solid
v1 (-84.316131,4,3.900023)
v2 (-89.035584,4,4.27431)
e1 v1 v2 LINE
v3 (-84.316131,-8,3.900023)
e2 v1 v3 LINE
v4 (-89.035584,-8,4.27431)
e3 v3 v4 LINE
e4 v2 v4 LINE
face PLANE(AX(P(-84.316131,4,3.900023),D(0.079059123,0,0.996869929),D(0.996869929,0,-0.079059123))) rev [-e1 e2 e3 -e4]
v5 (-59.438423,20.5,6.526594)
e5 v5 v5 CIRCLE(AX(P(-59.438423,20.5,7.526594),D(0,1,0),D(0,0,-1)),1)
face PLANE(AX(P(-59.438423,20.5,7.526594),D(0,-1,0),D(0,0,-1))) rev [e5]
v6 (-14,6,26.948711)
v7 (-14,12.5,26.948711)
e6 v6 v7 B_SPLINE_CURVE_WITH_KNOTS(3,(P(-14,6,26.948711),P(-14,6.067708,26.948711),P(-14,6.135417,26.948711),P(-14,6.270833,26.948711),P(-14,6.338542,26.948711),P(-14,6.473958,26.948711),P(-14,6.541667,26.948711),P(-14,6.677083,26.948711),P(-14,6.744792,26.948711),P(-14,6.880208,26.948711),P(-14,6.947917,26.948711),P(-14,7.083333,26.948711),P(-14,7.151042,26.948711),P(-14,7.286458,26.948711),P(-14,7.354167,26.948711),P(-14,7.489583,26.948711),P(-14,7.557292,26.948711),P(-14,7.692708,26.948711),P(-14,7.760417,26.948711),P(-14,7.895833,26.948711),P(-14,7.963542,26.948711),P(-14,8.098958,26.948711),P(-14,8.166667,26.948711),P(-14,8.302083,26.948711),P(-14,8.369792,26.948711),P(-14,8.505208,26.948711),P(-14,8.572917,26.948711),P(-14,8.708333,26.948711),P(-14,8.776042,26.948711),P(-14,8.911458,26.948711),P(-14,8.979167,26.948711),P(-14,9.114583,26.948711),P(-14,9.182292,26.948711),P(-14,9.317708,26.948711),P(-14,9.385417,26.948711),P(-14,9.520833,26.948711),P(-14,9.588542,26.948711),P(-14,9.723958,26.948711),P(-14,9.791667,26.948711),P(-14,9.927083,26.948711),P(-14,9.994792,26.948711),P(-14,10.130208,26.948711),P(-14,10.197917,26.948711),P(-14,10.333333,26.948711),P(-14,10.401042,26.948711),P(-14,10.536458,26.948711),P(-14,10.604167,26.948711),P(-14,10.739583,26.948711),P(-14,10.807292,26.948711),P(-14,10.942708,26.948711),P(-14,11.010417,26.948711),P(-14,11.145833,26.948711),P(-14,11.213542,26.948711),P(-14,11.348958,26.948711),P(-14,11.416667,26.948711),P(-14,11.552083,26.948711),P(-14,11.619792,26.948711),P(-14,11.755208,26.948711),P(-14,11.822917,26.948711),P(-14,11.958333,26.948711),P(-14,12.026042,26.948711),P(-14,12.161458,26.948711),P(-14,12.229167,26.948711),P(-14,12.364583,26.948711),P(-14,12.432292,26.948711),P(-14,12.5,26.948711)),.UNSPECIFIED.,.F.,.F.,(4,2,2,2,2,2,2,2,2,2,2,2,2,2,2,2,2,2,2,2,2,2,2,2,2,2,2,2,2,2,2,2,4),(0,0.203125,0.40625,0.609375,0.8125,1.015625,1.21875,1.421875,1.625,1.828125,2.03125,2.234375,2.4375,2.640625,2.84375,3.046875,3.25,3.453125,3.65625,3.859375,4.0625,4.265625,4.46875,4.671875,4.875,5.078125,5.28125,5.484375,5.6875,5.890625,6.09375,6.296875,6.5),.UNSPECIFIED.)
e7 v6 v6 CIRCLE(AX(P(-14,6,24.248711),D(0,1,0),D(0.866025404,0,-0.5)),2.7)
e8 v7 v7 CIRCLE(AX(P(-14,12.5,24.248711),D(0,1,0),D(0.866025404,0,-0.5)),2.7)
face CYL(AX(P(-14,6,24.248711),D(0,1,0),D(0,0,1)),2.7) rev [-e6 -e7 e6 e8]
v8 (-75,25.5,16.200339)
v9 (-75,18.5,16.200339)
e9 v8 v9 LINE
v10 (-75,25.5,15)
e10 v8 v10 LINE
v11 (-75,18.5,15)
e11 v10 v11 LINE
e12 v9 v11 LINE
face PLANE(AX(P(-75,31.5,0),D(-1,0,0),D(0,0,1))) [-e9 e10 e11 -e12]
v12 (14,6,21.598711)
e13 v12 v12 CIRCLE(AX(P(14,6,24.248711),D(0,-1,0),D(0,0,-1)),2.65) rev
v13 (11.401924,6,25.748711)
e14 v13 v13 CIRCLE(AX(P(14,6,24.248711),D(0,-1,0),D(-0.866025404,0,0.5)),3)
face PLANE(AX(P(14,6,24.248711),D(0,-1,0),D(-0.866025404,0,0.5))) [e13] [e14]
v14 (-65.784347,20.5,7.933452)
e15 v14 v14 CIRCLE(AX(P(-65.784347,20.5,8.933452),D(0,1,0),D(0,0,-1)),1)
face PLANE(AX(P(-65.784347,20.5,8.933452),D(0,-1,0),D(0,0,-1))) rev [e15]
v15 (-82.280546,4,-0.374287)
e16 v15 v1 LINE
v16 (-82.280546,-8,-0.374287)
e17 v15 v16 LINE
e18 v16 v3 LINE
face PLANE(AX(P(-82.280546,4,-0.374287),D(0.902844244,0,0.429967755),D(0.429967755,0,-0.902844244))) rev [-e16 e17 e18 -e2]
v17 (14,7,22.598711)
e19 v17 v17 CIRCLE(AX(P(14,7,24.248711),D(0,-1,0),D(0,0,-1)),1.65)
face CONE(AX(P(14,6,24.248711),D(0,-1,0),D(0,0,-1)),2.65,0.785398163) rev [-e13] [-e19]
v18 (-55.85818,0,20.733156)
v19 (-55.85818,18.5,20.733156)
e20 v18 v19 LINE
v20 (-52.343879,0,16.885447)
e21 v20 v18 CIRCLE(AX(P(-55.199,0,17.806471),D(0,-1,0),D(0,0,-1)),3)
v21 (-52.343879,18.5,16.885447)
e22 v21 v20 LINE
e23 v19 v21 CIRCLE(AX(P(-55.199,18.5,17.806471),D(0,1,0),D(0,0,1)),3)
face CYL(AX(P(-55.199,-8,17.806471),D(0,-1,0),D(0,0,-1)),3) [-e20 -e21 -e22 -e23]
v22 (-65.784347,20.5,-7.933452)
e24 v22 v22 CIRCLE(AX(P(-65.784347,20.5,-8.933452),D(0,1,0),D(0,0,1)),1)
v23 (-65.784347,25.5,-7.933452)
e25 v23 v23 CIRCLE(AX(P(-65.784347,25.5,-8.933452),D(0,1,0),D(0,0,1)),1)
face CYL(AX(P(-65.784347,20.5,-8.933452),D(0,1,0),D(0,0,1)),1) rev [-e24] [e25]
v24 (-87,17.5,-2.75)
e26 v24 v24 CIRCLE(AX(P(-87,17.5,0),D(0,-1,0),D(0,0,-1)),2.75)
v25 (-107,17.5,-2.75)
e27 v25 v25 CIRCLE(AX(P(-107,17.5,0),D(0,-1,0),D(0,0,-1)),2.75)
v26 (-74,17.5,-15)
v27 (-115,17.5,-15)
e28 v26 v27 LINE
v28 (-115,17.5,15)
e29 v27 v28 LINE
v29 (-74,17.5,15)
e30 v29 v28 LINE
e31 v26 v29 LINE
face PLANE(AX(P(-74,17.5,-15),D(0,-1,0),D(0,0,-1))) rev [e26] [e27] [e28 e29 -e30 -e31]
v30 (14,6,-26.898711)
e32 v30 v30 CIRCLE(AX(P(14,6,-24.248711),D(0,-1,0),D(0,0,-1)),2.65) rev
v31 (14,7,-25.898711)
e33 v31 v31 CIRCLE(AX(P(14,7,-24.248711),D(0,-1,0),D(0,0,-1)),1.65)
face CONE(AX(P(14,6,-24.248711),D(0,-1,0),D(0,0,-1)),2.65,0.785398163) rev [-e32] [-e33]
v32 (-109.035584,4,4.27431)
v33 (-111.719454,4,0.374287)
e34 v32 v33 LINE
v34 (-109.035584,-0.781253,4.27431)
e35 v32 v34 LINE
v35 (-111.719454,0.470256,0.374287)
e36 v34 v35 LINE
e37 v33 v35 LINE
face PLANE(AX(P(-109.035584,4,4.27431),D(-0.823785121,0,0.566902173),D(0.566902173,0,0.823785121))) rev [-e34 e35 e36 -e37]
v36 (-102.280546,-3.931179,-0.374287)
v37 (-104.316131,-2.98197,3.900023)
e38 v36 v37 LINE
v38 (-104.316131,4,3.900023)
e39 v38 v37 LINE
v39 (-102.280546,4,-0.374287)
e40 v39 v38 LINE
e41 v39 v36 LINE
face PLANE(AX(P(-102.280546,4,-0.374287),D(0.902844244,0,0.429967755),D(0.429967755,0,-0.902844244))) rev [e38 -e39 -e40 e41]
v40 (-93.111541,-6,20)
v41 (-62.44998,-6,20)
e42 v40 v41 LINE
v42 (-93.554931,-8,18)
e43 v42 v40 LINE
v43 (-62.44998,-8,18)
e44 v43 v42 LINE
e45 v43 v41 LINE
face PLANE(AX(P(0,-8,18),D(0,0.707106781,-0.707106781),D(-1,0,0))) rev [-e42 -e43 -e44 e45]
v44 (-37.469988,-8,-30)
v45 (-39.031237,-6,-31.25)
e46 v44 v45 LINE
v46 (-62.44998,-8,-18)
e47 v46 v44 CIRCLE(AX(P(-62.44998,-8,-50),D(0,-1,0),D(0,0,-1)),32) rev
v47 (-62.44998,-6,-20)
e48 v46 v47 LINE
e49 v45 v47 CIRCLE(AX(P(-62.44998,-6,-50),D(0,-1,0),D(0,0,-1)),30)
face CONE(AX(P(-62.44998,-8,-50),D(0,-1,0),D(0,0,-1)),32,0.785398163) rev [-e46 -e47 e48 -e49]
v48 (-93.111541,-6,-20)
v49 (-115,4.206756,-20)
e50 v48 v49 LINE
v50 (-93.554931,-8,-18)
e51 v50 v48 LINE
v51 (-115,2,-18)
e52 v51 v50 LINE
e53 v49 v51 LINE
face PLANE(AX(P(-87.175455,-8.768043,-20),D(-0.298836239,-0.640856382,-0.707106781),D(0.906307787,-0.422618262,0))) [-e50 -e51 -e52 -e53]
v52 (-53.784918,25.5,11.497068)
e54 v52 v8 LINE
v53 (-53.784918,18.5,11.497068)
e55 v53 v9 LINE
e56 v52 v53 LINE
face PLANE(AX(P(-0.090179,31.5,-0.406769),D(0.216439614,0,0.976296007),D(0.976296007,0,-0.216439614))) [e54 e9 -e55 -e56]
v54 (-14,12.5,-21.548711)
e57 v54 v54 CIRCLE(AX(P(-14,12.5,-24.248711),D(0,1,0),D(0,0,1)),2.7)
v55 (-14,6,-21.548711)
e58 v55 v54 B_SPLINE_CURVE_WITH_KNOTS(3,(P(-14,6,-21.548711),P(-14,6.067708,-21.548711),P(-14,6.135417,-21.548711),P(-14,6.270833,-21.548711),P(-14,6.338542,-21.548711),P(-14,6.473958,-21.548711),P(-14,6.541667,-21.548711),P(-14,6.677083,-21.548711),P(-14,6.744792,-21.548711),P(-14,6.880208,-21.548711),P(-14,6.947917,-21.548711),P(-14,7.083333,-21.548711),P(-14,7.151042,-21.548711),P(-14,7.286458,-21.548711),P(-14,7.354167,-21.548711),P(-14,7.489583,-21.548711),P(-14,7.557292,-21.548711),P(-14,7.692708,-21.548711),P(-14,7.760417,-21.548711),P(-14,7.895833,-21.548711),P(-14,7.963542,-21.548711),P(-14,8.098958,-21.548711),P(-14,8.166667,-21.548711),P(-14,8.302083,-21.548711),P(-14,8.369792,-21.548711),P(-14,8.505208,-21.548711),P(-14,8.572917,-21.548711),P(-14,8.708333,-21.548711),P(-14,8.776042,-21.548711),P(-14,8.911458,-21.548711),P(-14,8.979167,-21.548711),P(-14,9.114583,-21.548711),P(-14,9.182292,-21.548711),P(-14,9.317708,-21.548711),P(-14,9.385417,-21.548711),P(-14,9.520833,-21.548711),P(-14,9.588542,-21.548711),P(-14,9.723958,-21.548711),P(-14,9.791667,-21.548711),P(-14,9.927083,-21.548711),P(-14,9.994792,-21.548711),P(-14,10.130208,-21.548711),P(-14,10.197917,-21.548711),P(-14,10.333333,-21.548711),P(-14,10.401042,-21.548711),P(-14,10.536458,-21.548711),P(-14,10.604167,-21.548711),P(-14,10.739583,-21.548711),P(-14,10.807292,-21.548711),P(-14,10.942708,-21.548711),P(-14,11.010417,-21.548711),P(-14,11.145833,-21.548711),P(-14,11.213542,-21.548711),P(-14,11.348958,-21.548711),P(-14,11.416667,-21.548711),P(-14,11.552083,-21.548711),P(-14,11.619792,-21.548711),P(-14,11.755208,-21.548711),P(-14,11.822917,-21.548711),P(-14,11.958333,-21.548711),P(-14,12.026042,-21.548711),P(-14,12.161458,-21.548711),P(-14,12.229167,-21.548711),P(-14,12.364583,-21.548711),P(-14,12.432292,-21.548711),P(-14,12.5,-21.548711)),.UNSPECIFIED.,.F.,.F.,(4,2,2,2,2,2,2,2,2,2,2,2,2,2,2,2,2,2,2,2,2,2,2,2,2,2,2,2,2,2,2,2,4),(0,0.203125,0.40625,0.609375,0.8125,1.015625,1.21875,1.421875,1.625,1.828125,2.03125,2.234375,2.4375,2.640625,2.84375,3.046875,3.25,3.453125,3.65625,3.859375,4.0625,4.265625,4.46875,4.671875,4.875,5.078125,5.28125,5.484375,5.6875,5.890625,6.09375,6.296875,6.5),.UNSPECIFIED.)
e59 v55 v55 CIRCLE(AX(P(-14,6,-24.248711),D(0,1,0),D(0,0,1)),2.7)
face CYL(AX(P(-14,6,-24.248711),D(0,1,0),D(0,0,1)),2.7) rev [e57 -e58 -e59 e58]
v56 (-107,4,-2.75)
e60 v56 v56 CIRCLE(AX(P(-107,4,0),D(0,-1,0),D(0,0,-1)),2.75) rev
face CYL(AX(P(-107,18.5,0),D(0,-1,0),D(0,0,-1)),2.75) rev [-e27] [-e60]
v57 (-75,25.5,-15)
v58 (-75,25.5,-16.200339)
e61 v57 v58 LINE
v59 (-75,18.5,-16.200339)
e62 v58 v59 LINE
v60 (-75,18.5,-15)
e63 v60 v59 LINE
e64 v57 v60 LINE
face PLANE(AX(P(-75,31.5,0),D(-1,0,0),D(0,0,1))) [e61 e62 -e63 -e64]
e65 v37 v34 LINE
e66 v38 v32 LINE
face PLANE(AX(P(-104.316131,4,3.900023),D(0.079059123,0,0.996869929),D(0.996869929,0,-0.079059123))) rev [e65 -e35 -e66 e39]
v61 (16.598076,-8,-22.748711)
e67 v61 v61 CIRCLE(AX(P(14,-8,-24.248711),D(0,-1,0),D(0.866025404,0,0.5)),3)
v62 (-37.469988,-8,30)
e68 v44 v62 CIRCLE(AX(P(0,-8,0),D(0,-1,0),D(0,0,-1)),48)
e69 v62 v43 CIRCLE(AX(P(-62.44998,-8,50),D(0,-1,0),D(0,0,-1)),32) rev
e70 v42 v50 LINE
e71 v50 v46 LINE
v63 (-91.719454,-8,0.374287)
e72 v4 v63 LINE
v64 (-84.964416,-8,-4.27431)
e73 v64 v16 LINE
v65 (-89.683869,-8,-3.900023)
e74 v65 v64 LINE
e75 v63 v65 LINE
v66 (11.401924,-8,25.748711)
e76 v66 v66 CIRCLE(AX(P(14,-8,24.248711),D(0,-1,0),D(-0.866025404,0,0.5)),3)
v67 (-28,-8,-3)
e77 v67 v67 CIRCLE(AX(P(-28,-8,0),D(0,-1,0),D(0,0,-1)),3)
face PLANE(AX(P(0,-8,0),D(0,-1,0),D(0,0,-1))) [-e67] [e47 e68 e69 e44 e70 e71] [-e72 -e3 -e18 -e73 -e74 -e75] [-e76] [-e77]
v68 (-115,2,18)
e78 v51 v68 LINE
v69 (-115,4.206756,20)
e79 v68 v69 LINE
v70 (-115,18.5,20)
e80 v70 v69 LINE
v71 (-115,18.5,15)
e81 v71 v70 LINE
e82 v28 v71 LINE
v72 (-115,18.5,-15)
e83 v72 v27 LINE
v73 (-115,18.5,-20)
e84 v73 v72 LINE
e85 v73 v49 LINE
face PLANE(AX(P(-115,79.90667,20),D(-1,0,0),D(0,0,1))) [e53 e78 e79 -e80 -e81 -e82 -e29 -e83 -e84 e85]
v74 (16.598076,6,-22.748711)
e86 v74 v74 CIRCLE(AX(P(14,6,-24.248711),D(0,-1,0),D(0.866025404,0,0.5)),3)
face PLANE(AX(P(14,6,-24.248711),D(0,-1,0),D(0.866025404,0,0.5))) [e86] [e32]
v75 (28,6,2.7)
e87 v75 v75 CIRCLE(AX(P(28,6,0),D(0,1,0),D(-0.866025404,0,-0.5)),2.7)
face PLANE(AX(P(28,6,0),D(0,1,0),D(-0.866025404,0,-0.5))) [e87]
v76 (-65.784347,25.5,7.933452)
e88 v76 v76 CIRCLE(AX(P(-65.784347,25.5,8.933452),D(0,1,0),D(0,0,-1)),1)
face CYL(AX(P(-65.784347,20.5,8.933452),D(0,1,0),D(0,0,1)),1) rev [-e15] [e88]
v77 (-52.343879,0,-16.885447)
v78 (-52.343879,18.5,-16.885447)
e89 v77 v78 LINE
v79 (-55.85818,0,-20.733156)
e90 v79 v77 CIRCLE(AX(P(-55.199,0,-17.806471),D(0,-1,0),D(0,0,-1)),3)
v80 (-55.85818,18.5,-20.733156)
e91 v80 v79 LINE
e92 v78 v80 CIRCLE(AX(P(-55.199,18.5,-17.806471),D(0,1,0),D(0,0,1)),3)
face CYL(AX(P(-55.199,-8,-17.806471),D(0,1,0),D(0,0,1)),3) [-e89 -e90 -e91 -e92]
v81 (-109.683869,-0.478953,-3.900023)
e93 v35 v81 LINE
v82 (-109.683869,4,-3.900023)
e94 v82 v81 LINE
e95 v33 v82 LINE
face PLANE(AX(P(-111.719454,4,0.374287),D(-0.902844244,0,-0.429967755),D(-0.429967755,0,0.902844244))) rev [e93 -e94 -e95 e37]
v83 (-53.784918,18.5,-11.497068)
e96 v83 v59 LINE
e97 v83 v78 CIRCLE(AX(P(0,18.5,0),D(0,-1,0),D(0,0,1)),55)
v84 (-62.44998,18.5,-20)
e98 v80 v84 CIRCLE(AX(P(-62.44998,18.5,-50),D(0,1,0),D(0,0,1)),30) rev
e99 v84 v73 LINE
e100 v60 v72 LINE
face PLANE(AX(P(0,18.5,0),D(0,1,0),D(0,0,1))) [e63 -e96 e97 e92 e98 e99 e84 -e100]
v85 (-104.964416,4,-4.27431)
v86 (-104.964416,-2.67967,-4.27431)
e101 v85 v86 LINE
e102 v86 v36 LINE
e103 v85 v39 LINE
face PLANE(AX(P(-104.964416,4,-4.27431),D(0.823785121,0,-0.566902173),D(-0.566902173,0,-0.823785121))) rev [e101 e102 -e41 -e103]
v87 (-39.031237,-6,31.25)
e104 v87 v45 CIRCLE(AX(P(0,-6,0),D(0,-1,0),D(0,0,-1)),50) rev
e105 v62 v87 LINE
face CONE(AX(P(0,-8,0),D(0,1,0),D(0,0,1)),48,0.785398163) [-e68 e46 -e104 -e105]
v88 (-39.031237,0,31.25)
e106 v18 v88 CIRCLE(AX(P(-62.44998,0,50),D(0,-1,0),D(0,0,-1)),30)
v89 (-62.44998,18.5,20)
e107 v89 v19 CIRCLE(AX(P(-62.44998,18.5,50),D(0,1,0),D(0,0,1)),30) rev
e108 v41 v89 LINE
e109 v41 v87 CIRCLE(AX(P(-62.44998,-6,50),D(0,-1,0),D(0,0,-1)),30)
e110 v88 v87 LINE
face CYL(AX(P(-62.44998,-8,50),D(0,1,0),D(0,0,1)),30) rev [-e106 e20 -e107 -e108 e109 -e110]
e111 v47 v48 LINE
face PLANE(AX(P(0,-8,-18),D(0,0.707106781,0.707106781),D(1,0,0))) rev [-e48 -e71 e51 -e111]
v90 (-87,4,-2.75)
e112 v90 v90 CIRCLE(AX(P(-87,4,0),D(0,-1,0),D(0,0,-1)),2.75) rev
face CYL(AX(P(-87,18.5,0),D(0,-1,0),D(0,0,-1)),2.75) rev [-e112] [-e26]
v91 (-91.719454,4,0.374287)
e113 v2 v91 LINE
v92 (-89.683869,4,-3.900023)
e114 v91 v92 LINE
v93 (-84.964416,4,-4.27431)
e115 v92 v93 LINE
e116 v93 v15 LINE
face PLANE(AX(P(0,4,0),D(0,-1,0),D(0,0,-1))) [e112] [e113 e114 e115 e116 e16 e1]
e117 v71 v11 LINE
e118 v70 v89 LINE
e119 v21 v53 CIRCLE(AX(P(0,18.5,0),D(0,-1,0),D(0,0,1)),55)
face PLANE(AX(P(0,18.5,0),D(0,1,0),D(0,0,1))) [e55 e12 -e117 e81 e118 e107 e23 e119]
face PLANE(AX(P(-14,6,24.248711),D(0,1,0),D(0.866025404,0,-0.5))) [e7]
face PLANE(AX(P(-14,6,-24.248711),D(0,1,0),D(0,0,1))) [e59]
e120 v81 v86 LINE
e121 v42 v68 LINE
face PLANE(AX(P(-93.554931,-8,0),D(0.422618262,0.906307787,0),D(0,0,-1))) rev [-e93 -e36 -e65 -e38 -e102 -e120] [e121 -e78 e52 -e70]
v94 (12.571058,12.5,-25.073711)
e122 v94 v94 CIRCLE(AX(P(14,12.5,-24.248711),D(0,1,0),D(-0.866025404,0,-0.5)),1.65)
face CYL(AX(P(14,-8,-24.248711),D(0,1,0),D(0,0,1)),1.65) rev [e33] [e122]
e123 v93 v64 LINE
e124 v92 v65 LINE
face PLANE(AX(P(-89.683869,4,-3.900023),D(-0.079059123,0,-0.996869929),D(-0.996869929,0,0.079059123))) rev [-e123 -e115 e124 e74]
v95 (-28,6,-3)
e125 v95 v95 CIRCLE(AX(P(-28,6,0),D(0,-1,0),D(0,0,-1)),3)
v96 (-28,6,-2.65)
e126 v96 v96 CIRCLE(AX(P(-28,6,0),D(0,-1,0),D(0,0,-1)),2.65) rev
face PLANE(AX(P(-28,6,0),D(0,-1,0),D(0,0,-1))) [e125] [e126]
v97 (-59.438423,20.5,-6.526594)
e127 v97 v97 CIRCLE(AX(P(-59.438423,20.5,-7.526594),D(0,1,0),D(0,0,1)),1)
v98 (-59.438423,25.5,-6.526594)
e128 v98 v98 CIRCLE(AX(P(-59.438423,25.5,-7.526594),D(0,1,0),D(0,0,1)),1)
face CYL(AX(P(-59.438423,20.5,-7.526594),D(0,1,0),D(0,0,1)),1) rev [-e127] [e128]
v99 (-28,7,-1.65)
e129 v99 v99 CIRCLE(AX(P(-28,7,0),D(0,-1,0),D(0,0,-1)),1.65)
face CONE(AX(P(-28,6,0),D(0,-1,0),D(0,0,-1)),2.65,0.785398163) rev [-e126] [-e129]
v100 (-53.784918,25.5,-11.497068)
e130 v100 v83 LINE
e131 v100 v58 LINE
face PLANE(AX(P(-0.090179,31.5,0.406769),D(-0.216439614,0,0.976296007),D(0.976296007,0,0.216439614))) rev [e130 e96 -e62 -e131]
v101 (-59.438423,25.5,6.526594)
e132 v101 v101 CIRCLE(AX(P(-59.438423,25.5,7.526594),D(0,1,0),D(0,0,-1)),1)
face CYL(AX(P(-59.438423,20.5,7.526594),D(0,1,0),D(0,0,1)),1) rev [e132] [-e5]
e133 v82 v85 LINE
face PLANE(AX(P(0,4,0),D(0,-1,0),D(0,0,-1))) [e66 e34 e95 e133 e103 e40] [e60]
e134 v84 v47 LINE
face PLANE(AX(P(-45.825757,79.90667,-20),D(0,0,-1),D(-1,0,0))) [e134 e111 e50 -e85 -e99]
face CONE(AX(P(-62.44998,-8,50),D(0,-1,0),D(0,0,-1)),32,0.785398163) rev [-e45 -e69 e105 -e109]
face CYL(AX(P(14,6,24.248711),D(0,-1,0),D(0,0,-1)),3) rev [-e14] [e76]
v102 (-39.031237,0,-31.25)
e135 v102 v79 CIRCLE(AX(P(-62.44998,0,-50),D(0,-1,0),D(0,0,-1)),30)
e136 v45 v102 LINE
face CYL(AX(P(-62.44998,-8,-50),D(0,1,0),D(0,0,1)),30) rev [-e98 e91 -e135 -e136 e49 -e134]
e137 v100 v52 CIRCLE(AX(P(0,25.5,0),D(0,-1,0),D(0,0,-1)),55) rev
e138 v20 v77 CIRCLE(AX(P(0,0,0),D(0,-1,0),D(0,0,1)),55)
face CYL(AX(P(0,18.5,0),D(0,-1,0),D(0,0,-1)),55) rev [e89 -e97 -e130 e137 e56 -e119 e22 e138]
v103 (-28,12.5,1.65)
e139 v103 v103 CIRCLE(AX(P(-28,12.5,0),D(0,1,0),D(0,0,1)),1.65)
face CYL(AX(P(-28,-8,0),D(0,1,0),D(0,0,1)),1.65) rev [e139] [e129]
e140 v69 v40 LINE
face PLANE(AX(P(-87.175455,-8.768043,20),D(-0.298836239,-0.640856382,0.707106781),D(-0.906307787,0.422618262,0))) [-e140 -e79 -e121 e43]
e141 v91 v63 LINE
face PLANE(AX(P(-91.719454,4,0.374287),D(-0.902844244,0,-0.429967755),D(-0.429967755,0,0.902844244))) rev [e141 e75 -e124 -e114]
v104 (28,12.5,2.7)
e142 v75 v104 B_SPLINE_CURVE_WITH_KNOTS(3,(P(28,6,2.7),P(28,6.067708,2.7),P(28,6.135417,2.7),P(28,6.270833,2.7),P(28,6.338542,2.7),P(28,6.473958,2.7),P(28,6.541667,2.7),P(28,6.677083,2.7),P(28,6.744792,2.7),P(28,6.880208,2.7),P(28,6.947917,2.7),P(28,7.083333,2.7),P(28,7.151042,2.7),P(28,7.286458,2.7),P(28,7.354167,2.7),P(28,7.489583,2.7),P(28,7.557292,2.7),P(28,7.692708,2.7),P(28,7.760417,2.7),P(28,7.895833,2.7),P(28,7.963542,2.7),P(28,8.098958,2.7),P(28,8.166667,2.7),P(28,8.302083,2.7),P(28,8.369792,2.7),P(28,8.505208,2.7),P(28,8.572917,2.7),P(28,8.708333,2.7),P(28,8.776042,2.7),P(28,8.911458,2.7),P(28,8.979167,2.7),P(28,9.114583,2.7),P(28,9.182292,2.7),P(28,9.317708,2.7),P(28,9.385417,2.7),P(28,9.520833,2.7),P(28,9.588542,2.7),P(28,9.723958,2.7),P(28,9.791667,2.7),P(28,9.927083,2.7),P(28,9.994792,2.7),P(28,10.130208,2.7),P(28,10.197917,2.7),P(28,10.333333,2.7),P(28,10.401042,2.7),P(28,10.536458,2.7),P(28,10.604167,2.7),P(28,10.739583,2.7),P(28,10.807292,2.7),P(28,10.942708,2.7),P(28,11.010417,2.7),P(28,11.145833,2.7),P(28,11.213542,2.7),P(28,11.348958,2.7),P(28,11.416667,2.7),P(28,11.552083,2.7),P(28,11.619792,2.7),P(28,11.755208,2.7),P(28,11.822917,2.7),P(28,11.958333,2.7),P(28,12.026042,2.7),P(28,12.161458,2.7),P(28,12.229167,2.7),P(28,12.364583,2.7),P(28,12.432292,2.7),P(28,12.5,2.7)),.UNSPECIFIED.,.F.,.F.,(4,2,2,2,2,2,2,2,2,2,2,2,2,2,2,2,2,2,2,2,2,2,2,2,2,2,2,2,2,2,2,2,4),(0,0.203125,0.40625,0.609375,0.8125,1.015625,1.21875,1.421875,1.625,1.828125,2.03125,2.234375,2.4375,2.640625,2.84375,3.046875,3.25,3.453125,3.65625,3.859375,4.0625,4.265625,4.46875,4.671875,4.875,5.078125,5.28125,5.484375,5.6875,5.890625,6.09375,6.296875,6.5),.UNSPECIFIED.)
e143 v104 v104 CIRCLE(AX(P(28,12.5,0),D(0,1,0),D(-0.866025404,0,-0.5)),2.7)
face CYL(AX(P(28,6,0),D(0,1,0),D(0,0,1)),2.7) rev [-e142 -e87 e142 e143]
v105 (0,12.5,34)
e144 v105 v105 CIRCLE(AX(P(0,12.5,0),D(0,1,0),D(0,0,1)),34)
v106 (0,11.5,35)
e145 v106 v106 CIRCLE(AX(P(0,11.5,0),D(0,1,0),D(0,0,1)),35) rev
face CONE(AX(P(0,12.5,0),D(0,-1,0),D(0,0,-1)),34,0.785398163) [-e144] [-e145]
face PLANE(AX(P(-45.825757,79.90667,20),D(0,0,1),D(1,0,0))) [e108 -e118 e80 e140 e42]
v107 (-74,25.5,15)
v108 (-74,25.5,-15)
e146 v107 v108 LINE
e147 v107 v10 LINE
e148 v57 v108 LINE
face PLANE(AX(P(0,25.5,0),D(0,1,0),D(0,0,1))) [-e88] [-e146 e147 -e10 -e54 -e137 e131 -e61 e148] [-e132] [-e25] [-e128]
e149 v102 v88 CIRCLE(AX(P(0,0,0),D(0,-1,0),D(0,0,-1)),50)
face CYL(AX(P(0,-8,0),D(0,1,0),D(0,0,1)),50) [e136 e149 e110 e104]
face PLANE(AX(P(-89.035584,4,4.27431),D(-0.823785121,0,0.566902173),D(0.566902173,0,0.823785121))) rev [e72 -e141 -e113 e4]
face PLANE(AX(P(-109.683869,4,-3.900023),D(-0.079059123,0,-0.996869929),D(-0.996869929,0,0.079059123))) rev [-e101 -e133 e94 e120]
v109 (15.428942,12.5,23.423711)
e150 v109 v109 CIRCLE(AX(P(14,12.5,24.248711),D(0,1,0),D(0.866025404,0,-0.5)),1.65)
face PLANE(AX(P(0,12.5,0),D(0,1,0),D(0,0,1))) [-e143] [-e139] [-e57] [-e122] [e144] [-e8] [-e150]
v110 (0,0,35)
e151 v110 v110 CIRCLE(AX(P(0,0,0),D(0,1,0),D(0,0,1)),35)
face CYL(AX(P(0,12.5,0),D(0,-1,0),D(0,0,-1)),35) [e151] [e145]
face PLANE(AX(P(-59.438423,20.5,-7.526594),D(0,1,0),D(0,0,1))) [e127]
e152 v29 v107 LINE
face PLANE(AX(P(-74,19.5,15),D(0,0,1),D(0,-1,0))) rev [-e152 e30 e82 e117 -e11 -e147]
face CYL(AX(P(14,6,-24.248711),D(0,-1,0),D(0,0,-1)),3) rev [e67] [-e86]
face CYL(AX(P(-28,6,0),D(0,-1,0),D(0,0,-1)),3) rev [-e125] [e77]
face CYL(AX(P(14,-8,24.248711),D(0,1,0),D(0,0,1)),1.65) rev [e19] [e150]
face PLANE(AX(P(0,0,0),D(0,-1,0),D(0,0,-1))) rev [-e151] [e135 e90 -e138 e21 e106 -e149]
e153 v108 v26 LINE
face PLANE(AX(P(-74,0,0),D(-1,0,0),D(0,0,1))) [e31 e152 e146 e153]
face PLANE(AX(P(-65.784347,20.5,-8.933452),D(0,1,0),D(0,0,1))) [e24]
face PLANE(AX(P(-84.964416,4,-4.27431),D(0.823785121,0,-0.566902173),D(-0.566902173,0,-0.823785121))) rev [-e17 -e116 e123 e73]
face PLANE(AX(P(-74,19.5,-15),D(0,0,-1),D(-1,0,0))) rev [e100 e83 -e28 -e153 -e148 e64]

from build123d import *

# Parameters (mm, degrees)
SKETCH1_R           = 35.00000000000001
BOSS_EXTRUDE1_DEPTH = 1
SKETCH3_R           = 50
BOSS_EXTRUDE3_DEPTH = 8
BOSS_EXTRUDE5_START = -8
BOSS_EXTRUDE5_DEPTH = 8
BOSS_EXTRUDE6_DEPTH = 18.5
FILLET1_R           = 30
CUT_EXTRUDE14_DEPTH = 41
SKETCH26_R          = 2.750000000000008
CUT_EXTRUDE15_DEPTH = 129.1688339652039
CUT_EXTRUDE16_DEPTH = 12
BOSS_EXTRUDE7_DEPTH = 13
CUT_EXTRUDE21_DEPTH = 6
SKETCH34_R          = 0.9999999999999981
SKETCH34_R_2        = 0.9999999999999836
SKETCH34_R_3        = 0.9999999999999983
CUT_EXTRUDE22_DEPTH = 5
CHAMFER4_SIZE       = 1
FILLET3_R           = 3
CHAMFER6_SIZE       = 21.445069205
CHAMFER6_SIZE_2     = 10
CHAMFER7_SIZE       = 2
SKETCH37_W          = 12.834846050171059
SKETCH37_H          = 29.012722943474188
CUT_EXTRUDE24_DEPTH = 15
SKETCH38_R          = 27.891707032209062
CUT_EXTRUDE25_DEPTH = 6
SKETCH39_R          = 35.00000000000001
BOSS_EXTRUDE8_DEPTH = 12.5
CHAMFER8_SIZE       = 1
SKETCH40_R          = 2.700000000000001
CUT_EXTRUDE26_DEPTH = 6.5
CIRPATTERN1_COUNT   = 3
SKETCH41_R          = 1.6499999999999986
CUT_EXTRUDE27_DEPTH = 128.06396040183856
SKETCH42_R          = 2.9999999999999973
CUT_EXTRUDE28_DEPTH = 14
CIRPATTERN2_COUNT   = 3
CHAMFER9_SIZE       = 1


# Some blends are built 0.0001 mm under size
with BuildPart() as part:
    # Sketch1 → Boss-Extrude1 (new body)
    with BuildSketch(Plane(origin=(0, 0, 0), x_dir=(1, 0, 0), z_dir=(0, 1, 0))):
        with Locations(Location((0, 0, 0), (0, 0, 270))):
            Circle(SKETCH1_R)
    extrude(amount=BOSS_EXTRUDE1_DEPTH)

    # Sketch3 → Boss-Extrude3 (add)
    with BuildSketch(Plane.XZ):
        with Locations(Location((0, 0, 0), (0, 0, 270))):
            Circle(SKETCH3_R)
    extrude(amount=BOSS_EXTRUDE3_DEPTH)

    # Sketch22 → Boss-Extrude5 (add)
    with BuildSketch(Plane.XZ.offset(8).offset(BOSS_EXTRUDE5_START)):
        with BuildLine():
            Line((-45.82575694955839, 20.000000000000004), (-115.00000000000001, 19.999999999999996))
            Line((-115.00000000000001, 19.999999999999996), (-114.99999999999999, -20.000000000000004))
            Line((-114.99999999999999, -20.000000000000004), (-45.825756949558404, -19.999999999999996))
            ThreePointArc((-45.825756949558404, -19.999999999999996), (-49.99999999999999, 6.12e-15), (-45.82575694955839, 20.000000000000004))
        make_face()
    extrude(amount=BOSS_EXTRUDE5_DEPTH)

    # Sketch24 → Boss-Extrude6 (add)
    with BuildSketch(Plane(origin=(0, 0, 0), x_dir=(1, 0, 0), z_dir=(0, 1, 0))):
        with BuildLine():
            Line((-115, -20), (-51.234753829797995, -20))
            ThreePointArc((-51.234753829797995, -20), (-55.00000000000001, -1.769e-14), (-51.234753829798, 19.999999999999986))
            Line((-51.234753829798, 19.999999999999986), (-115, 20))
            Line((-115, 20), (-115, -20))
        make_face()
    extrude(amount=BOSS_EXTRUDE6_DEPTH)

    # Fillet1
    # the kernel refuses this fillet: 30 mm, written as the material it adds along each edge
    with BuildSketch(Plane(origin=(-45.82575694955841, 41.56055758606396, -19.99999999999998), x_dir=(0.5169843319372891, 0, -0.8559948601080236), z_dir=(0, -1, 0))) as fillet1_piece_1_section:
        with BuildLine():
            CenterArc((17.08538296381171, -29.73977942887639), FILLET1_R, 97.55200448764381, 51.31781254651054)
            Line((-8.594462839428994, -14.230249470757709), (0, 0))
            ThreePointArc((0, 0), (6.571301139927558, -0.4337009518726829), (13.142602279855161, 2.6e-16))
        make_face()
    fillet1_piece_1 = extrude(amount=49.56055758606396, mode=Mode.PRIVATE)
    fillet1_piece_1 = split(fillet1_piece_1, bisect_by=Plane(origin=(-54.99640948275243, 0, -20.321571005076215), z_dir=(0, 1, 0)), keep=Keep.TOP, mode=Mode.PRIVATE)
    fillet1_piece_1 = fillet1_piece_1 - Plane(origin=(-9.592e-14, 9.249999999999998, -8.9e-16), x_dir=(-0.9315409787235996, 0, 0.36363636363636426), z_dir=(0, -1, 0)) * Cylinder(54.999999999999915, 157, mode=Mode.PRIVATE)
    fillet1_piece_1 = split(fillet1_piece_1, bisect_by=Plane(origin=(-54.99640948275243, 18.5, -20.321571005076215), z_dir=(0, -1, 0)), keep=Keep.TOP, mode=Mode.PRIVATE)
    add(fillet1_piece_1)
    with BuildSketch(Plane(origin=(-45.825756949558404, 0, -20), x_dir=(0.5169843319372893, 0, -0.8559948601080234), z_dir=(0, -1, 0))) as fillet1_piece_2_section:
        with BuildLine():
            CenterArc((17.08538296381168, -29.739779428876385), FILLET1_R, 97.5520044876438, 51.31781254651055)
            Line((-8.594462839429019, -14.2302494707577), (0, 0))
            ThreePointArc((0, 0), (6.571301139927535, -0.4337009518726803), (13.142602279855138, 7.9e-16))
        make_face()
    fillet1_piece_2 = extrude(amount=8, mode=Mode.PRIVATE)
    fillet1_piece_2 = fillet1_piece_2 & Plane(origin=(-9.592e-14, -4, -8.9e-16), x_dir=(-0.9315409787235996, 0, 0.36363636363636426), z_dir=(0, -1, 0)) * Cylinder(54.999999999999915, 73, mode=Mode.PRIVATE)
    add(fillet1_piece_2)
    with BuildSketch(Plane(origin=(-45.825756949558404, 0, -20), x_dir=(0.5169843319372893, 0, -0.8559948601080234), z_dir=(0, -1, 0))) as fillet1_piece_3_section:
        with BuildLine():
            CenterArc((17.08538296381168, -29.739779428876385), FILLET1_R, 97.5520044876438, 51.31781254651055)
            Line((-8.594462839429019, -14.2302494707577), (0, 0))
            ThreePointArc((0, 0), (6.571301139927535, -0.4337009518726803), (13.142602279855138, 7.9e-16))
        make_face()
    fillet1_piece_3 = extrude(amount=8, mode=Mode.PRIVATE)
    fillet1_piece_3 = fillet1_piece_3 - Plane(origin=(-9.592e-14, -4, -8.9e-16), x_dir=(-0.9315409787235996, 0, 0.36363636363636426), z_dir=(0, -1, 0)) * Cylinder(54.999999999999915, 73, mode=Mode.PRIVATE)
    add(fillet1_piece_3)
    with BuildSketch(Plane(origin=(-45.82575694955839, 41.56055758606398, 20.000000000000007), x_dir=(0.5169843319372891, 0, 0.8559948601080235), z_dir=(0, -1, 0))) as fillet1_piece_4_section:
        with BuildLine():
            CenterArc((17.085382963811668, 29.739779428876385), FILLET1_R, 211.13018296584565, 51.31781254651054)
            Line((-8.594462839429031, 14.2302494707577), (0, 0))
            ThreePointArc((0, 0), (6.571301139927557, 0.4337009518726914), (13.142602279855119, 9.1e-16))
        make_face()
    fillet1_piece_4 = extrude(amount=49.56055758606398, mode=Mode.PRIVATE)
    fillet1_piece_4 = split(fillet1_piece_4, bisect_by=Plane(origin=(-54.99640948275241, 0, 20.321571005076237), z_dir=(0, 1, 0)), keep=Keep.TOP, mode=Mode.PRIVATE)
    fillet1_piece_4 = split(fillet1_piece_4, bisect_by=Plane(origin=(-54.99640948275241, 18.5, 20.321571005076237), z_dir=(0, -1, 0)), keep=Keep.TOP, mode=Mode.PRIVATE)
    fillet1_piece_4 = fillet1_piece_4 - Plane(origin=(-9.592e-14, 9.249999999999996, -8.9e-16), x_dir=(-0.9315409787235996, 0, 0.36363636363636426), z_dir=(0, -1, 0)) * Cylinder(54.999999999999915, 157, mode=Mode.PRIVATE)
    add(fillet1_piece_4)
    with BuildSketch(Plane(origin=(-45.82575694955839, 0, 20.000000000000007), x_dir=(0.5169843319372891, 0, 0.8559948601080235), z_dir=(0, -1, 0))) as fillet1_piece_5_section:
        with BuildLine():
            CenterArc((17.085382963811668, 29.739779428876385), FILLET1_R, 211.13018296584565, 51.31781254651054)
            Line((-8.594462839429031, 14.2302494707577), (0, 0))
            ThreePointArc((0, 0), (6.571301139927557, 0.4337009518726914), (13.142602279855119, 9.1e-16))
        make_face()
    fillet1_piece_5 = extrude(amount=8, mode=Mode.PRIVATE)
    fillet1_piece_5 = fillet1_piece_5 & Plane(origin=(-9.592e-14, -4.000000000000001, -8.9e-16), x_dir=(-0.9315409787235996, 0, 0.36363636363636426), z_dir=(0, -1, 0)) * Cylinder(54.999999999999915, 73, mode=Mode.PRIVATE)
    add(fillet1_piece_5)
    with BuildSketch(Plane(origin=(-45.82575694955839, 0, 20.000000000000007), x_dir=(0.5169843319372891, 0, 0.8559948601080235), z_dir=(0, -1, 0))) as fillet1_piece_6_section:
        with BuildLine():
            CenterArc((17.085382963811668, 29.739779428876385), FILLET1_R, 211.13018296584565, 51.31781254651054)
            Line((-8.594462839429031, 14.2302494707577), (0, 0))
            ThreePointArc((0, 0), (6.571301139927557, 0.4337009518726914), (13.142602279855119, 9.1e-16))
        make_face()
    fillet1_piece_6 = extrude(amount=8, mode=Mode.PRIVATE)
    fillet1_piece_6 = fillet1_piece_6 - Plane(origin=(-9.592e-14, -3.9999999999999996, -8.9e-16), x_dir=(-0.9315409787235996, 0, 0.36363636363636426), z_dir=(0, -1, 0)) * Cylinder(54.999999999999915, 73, mode=Mode.PRIVATE)
    add(fillet1_piece_6)

    # Sketch25 → Cut-Extrude14 (cut)
    with BuildSketch(Plane.ZY.offset(115)):
        Polygon((-14.999999999999982, 19.5), (15.000000000000018, 19.5), (15.000000000000016, 17.499999999999996), (-14.999999999999982, 17.499999999999996), align=None)
    extrude(amount=-CUT_EXTRUDE14_DEPTH, mode=Mode.SUBTRACT)

    # Sketch26 → Cut-Extrude15 (cut, through all)
    with BuildSketch(Plane.XZ.offset(8)):
        with Locations(Location((-107.00000000000001, 0, 0), (0, 0, 270))):
            Circle(SKETCH26_R)
        with Locations(Location((-87.00000000000001, 0, 0), (0, 0, 270))):
            Circle(SKETCH26_R)
    extrude(amount=-CUT_EXTRUDE15_DEPTH, mode=Mode.SUBTRACT)

    # Sketch27 → Cut-Extrude16 (cut)
    with BuildSketch(Plane.XZ.offset(8)):
        Polygon((-82.28054640148135, -0.37428740930267296), (-84.31613079596788, 3.900023003647695), (-89.03558439448656, 4.274310412950378), (-91.71945359851865, 0.37428740930269205), (-89.6838692040321, -3.900023003647699), (-84.96441560551347, -4.27431041295038), align=None)
        Polygon((-102.2805464014813, -0.3742874093023039), (-104.31613079596819, 3.9000230036479127), (-109.03558439448689, 4.2743104129502205), (-111.71945359851868, 0.3742874093023178), (-109.6838692040318, -3.9000230036479184), (-104.96441560551311, -4.274310412950226), align=None)
    extrude(amount=-CUT_EXTRUDE16_DEPTH, mode=Mode.SUBTRACT)

    # Sketch31 → Boss-Extrude7 (add)
    with BuildSketch(Plane(origin=(0, 18.5, 0), x_dir=(1, 0, 0), z_dir=(0, 1, 0))):
        with BuildLine():
            ThreePointArc((-53.78491816400905, -11.497068238940331), (-55.00000000000001, 1.78e-15), (-53.78491816400905, 11.497068238940333))
            Line((-53.784918164009056, 11.49706823894033), (-75.00000000000001, 16.200338649512723))
            Line((-75.00000000000001, 16.200338649512723), (-75.00000000000001, 15.000000000000064))
            Line((-75.00000000000001, 15.000000000000062), (-74.00000000000001, 15.000000000000062))
            Line((-74.00000000000001, 15.000000000000062), (-74.00000000000001, -14.999999999999938))
            Line((-74.00000000000001, -14.99999999999994), (-75.00000000000001, -14.99999999999994))
            Line((-75.00000000000001, -14.99999999999994), (-75.00000000000001, -16.20033864951273))
            Line((-75.00000000000001, -16.20033864951273), (-53.78491816400905, -11.497068238940331))
        make_face()
    extrude(amount=BOSS_EXTRUDE7_DEPTH)

    # Sketch33 → Cut-Extrude21 (cut)
    with BuildSketch(Plane(origin=(0, 31.5, 0), x_dir=(1, 0, 0), z_dir=(0, 1, 0))):
        Polygon((-55.01517410235079, -11.769809414155478), (-67.9999109970459, -14.648456279532263), (-70.10648365162008, -5.146321092962614), (-75.00000000000001, -5.146321092962625), (-75.00000000000001, 5.14632109296261), (-70.10648365162008, 5.146321092962607), (-67.9999109970459, 14.648456279532258), (-55.0151741023508, 11.769809414155473), (-57.019051941153975, 2.730900606366049), (-57.019051941153975, -2.730900606366056), align=None)
    extrude(amount=-CUT_EXTRUDE21_DEPTH, mode=Mode.SUBTRACT)

    # Sketch34 → Cut-Extrude22 (cut)
    with BuildSketch(Plane(origin=(0, 25.500000000000004, 0), x_dir=(1, 0, 0), z_dir=(0, 1, 0))):
        with Locations(Location((-59.4384225576429, -7.526594465233379, 0), (0, 0, 90))):
            Circle(SKETCH34_R)
        with Locations(Location((-65.78434660392244, -8.93345195583105, 0), (0, 0, 90))):
            Circle(SKETCH34_R_2)
        with Locations(Location((-65.78434660392244, 8.933451955831046, 0), (0, 0, 270))):
            Circle(SKETCH34_R_3)
        with Locations(Location((-59.4384225576429, 7.526594465233379, 0), (0, 0, 270))):
            Circle(SKETCH34_R_3)
    extrude(amount=-CUT_EXTRUDE22_DEPTH, mode=Mode.SUBTRACT)

    # Chamfer4
    chamfer4_edges = [part.edges().sort_by_distance(p)[0] for p in [
        (1.072e-14, 1, -35.00000000000001),
    ]]
    chamfer(chamfer4_edges, length=CHAMFER4_SIZE - 0.0001)  # a hair under: the kernel refuses the full size

    # Fillet3
    fillet3_edges = [part.edges().sort_by_distance(p)[0] for p in [
        (-50.11900944881917, 9.25, -22.651377262082175),
        (-50.11900944881917, 9.25, 22.651377262082175),
    ]]
    fillet(fillet3_edges, radius=FILLET3_R)

    # Chamfer6
    # the kernel refuses this chamfer: 21.445069205, 10 mm, written as the material it takes off along each edge
    with BuildSketch(Plane(origin=(-115.00000000000006, -8, 75.56364829338291), x_dir=(0.9998669641130703, -0.01631116413111022, 0), z_dir=(7.1e-16, 0, -1))) as chamfer6_piece_1:
        Polygon((CHAMFER6_SIZE * 0.999866964118, -CHAMFER6_SIZE * 0.0163111641312), (-CHAMFER6_SIZE_2 * 0.0163111641311, -CHAMFER6_SIZE_2 * 0.999866964113), (0, 0), align=None)
    extrude(amount=151.12729658676582, mode=Mode.SUBTRACT)

    # Chamfer7
    chamfer7_edges = [part.edges().sort_by_distance(p)[0] for p in [
        (-78.00245538943895, -8, -20),
        (-104.27746539744713, -2.9999999999993117, -20.000000000000014),
        (-104.27746539744714, -2.999999999999309, 19.99999999999999),
        (50.00000000000001, -8, -1.2434e-13),
        (-78.00245538943881, -8, 20),
        (-49.459598927217584, -8, -22.958365434019104),
        (-49.45959892721735, -8, 22.958365434019218),
    ]]
    chamfer(chamfer7_edges, length=CHAMFER7_SIZE)

    # Sketch37 → Cut-Extrude24 (cut)
    with BuildSketch(Plane(origin=(0, 25.500000000000004, 0), x_dir=(1, 0, 0), z_dir=(0, 1, 0))):
        with Locations((-55, 2.66e-15)):
            Rectangle(SKETCH37_W, SKETCH37_H)
    extrude(amount=CUT_EXTRUDE24_DEPTH, mode=Mode.SUBTRACT)

    # Sketch38 → Cut-Extrude25 (cut)
    with BuildSketch(Plane(origin=(0, 25.500000000000004, 0), x_dir=(1, 0, 0), z_dir=(0, 1, 0))):
        with Locations((-75.67479968793842, -4.698694832568158)):
            Circle(SKETCH38_R)
    extrude(amount=CUT_EXTRUDE25_DEPTH, mode=Mode.SUBTRACT)

    # Sketch39 → Boss-Extrude8 (add)
    with BuildSketch(Plane(origin=(0, 0, 0), x_dir=(1, 0, 0), z_dir=(0, 1, 0))):
        with Locations(Location((0, 0, 0), (0, 0, 270))):
            Circle(SKETCH39_R)
    extrude(amount=BOSS_EXTRUDE8_DEPTH)

    # Chamfer8
    chamfer8_edges = [part.edges().sort_by_distance(p)[0] for p in [
        (1.072e-14, 12.5, -35.00000000000001),
    ]]
    chamfer(chamfer8_edges, length=CHAMFER8_SIZE)

    # Sketch40 → Cut-Extrude26 (cut)
    with BuildSketch(Plane(origin=(0, 12.5, 0), x_dir=(1, 0, 0), z_dir=(0, 1, 0))):
        with Locations(Location((-13.999999999999947, 24.248711305964314, 0), (0, 0, 270))):
            Circle(SKETCH40_R)
    cut_extrude26 = extrude(amount=-CUT_EXTRUDE26_DEPTH, mode=Mode.SUBTRACT)

    # CirPattern1: Cut-Extrude26 ×3 about axis
    cirpattern1_axis = Axis((-1.23e-15, 0, 1.87e-15), (0, 1, 0))
    for i in range(1, CIRPATTERN1_COUNT):
        add(cut_extrude26.rotate(cirpattern1_axis, i * 360 / CIRPATTERN1_COUNT), mode=Mode.SUBTRACT)

    # Sketch41 → Cut-Extrude27 (cut, through all)
    with BuildSketch(Plane(origin=(0, 12.5, 0), x_dir=(1, 0, 0), z_dir=(0, 1, 0))):
        with Locations(Location((-28, -2.0238e-13, 0), (0, 0, 270))):
            Circle(SKETCH41_R)
    cut_extrude27 = extrude(amount=-CUT_EXTRUDE27_DEPTH, mode=Mode.SUBTRACT)

    # Sketch42 → Cut-Extrude28 (cut)
    with BuildSketch(Plane.XZ.offset(8)):
        with Locations(Location((-28, 2.0123e-13, 0), (0, 0, 270))):
            Circle(SKETCH42_R)
    cut_extrude28 = extrude(amount=-CUT_EXTRUDE28_DEPTH, mode=Mode.SUBTRACT)

    # CirPattern2: Cut-Extrude27, Cut-Extrude28 ×3 about axis
    cirpattern2_axis = Axis((1.44e-15, 0, 1.48e-15), (0, 1, 0))
    add([cut_extrude27.rotate(cirpattern2_axis, i * 360 / CIRPATTERN2_COUNT) for i in range(1, CIRPATTERN2_COUNT)], mode=Mode.SUBTRACT)
    add([cut_extrude28.rotate(cirpattern2_axis, i * 360 / CIRPATTERN2_COUNT) for i in range(1, CIRPATTERN2_COUNT)], mode=Mode.SUBTRACT)

    # Chamfer9
    chamfer9_edges = [part.edges().sort_by_distance(p)[0] for p in [
        (-28, 6, -1.6499999999997963),
        (12.571058083755846, 6, 25.07371130596419),
        (15.428941916244161, 6, -23.423711305964375),
    ]]
    chamfer(chamfer9_edges, length=CHAMFER9_SIZE)


solid = part.part
